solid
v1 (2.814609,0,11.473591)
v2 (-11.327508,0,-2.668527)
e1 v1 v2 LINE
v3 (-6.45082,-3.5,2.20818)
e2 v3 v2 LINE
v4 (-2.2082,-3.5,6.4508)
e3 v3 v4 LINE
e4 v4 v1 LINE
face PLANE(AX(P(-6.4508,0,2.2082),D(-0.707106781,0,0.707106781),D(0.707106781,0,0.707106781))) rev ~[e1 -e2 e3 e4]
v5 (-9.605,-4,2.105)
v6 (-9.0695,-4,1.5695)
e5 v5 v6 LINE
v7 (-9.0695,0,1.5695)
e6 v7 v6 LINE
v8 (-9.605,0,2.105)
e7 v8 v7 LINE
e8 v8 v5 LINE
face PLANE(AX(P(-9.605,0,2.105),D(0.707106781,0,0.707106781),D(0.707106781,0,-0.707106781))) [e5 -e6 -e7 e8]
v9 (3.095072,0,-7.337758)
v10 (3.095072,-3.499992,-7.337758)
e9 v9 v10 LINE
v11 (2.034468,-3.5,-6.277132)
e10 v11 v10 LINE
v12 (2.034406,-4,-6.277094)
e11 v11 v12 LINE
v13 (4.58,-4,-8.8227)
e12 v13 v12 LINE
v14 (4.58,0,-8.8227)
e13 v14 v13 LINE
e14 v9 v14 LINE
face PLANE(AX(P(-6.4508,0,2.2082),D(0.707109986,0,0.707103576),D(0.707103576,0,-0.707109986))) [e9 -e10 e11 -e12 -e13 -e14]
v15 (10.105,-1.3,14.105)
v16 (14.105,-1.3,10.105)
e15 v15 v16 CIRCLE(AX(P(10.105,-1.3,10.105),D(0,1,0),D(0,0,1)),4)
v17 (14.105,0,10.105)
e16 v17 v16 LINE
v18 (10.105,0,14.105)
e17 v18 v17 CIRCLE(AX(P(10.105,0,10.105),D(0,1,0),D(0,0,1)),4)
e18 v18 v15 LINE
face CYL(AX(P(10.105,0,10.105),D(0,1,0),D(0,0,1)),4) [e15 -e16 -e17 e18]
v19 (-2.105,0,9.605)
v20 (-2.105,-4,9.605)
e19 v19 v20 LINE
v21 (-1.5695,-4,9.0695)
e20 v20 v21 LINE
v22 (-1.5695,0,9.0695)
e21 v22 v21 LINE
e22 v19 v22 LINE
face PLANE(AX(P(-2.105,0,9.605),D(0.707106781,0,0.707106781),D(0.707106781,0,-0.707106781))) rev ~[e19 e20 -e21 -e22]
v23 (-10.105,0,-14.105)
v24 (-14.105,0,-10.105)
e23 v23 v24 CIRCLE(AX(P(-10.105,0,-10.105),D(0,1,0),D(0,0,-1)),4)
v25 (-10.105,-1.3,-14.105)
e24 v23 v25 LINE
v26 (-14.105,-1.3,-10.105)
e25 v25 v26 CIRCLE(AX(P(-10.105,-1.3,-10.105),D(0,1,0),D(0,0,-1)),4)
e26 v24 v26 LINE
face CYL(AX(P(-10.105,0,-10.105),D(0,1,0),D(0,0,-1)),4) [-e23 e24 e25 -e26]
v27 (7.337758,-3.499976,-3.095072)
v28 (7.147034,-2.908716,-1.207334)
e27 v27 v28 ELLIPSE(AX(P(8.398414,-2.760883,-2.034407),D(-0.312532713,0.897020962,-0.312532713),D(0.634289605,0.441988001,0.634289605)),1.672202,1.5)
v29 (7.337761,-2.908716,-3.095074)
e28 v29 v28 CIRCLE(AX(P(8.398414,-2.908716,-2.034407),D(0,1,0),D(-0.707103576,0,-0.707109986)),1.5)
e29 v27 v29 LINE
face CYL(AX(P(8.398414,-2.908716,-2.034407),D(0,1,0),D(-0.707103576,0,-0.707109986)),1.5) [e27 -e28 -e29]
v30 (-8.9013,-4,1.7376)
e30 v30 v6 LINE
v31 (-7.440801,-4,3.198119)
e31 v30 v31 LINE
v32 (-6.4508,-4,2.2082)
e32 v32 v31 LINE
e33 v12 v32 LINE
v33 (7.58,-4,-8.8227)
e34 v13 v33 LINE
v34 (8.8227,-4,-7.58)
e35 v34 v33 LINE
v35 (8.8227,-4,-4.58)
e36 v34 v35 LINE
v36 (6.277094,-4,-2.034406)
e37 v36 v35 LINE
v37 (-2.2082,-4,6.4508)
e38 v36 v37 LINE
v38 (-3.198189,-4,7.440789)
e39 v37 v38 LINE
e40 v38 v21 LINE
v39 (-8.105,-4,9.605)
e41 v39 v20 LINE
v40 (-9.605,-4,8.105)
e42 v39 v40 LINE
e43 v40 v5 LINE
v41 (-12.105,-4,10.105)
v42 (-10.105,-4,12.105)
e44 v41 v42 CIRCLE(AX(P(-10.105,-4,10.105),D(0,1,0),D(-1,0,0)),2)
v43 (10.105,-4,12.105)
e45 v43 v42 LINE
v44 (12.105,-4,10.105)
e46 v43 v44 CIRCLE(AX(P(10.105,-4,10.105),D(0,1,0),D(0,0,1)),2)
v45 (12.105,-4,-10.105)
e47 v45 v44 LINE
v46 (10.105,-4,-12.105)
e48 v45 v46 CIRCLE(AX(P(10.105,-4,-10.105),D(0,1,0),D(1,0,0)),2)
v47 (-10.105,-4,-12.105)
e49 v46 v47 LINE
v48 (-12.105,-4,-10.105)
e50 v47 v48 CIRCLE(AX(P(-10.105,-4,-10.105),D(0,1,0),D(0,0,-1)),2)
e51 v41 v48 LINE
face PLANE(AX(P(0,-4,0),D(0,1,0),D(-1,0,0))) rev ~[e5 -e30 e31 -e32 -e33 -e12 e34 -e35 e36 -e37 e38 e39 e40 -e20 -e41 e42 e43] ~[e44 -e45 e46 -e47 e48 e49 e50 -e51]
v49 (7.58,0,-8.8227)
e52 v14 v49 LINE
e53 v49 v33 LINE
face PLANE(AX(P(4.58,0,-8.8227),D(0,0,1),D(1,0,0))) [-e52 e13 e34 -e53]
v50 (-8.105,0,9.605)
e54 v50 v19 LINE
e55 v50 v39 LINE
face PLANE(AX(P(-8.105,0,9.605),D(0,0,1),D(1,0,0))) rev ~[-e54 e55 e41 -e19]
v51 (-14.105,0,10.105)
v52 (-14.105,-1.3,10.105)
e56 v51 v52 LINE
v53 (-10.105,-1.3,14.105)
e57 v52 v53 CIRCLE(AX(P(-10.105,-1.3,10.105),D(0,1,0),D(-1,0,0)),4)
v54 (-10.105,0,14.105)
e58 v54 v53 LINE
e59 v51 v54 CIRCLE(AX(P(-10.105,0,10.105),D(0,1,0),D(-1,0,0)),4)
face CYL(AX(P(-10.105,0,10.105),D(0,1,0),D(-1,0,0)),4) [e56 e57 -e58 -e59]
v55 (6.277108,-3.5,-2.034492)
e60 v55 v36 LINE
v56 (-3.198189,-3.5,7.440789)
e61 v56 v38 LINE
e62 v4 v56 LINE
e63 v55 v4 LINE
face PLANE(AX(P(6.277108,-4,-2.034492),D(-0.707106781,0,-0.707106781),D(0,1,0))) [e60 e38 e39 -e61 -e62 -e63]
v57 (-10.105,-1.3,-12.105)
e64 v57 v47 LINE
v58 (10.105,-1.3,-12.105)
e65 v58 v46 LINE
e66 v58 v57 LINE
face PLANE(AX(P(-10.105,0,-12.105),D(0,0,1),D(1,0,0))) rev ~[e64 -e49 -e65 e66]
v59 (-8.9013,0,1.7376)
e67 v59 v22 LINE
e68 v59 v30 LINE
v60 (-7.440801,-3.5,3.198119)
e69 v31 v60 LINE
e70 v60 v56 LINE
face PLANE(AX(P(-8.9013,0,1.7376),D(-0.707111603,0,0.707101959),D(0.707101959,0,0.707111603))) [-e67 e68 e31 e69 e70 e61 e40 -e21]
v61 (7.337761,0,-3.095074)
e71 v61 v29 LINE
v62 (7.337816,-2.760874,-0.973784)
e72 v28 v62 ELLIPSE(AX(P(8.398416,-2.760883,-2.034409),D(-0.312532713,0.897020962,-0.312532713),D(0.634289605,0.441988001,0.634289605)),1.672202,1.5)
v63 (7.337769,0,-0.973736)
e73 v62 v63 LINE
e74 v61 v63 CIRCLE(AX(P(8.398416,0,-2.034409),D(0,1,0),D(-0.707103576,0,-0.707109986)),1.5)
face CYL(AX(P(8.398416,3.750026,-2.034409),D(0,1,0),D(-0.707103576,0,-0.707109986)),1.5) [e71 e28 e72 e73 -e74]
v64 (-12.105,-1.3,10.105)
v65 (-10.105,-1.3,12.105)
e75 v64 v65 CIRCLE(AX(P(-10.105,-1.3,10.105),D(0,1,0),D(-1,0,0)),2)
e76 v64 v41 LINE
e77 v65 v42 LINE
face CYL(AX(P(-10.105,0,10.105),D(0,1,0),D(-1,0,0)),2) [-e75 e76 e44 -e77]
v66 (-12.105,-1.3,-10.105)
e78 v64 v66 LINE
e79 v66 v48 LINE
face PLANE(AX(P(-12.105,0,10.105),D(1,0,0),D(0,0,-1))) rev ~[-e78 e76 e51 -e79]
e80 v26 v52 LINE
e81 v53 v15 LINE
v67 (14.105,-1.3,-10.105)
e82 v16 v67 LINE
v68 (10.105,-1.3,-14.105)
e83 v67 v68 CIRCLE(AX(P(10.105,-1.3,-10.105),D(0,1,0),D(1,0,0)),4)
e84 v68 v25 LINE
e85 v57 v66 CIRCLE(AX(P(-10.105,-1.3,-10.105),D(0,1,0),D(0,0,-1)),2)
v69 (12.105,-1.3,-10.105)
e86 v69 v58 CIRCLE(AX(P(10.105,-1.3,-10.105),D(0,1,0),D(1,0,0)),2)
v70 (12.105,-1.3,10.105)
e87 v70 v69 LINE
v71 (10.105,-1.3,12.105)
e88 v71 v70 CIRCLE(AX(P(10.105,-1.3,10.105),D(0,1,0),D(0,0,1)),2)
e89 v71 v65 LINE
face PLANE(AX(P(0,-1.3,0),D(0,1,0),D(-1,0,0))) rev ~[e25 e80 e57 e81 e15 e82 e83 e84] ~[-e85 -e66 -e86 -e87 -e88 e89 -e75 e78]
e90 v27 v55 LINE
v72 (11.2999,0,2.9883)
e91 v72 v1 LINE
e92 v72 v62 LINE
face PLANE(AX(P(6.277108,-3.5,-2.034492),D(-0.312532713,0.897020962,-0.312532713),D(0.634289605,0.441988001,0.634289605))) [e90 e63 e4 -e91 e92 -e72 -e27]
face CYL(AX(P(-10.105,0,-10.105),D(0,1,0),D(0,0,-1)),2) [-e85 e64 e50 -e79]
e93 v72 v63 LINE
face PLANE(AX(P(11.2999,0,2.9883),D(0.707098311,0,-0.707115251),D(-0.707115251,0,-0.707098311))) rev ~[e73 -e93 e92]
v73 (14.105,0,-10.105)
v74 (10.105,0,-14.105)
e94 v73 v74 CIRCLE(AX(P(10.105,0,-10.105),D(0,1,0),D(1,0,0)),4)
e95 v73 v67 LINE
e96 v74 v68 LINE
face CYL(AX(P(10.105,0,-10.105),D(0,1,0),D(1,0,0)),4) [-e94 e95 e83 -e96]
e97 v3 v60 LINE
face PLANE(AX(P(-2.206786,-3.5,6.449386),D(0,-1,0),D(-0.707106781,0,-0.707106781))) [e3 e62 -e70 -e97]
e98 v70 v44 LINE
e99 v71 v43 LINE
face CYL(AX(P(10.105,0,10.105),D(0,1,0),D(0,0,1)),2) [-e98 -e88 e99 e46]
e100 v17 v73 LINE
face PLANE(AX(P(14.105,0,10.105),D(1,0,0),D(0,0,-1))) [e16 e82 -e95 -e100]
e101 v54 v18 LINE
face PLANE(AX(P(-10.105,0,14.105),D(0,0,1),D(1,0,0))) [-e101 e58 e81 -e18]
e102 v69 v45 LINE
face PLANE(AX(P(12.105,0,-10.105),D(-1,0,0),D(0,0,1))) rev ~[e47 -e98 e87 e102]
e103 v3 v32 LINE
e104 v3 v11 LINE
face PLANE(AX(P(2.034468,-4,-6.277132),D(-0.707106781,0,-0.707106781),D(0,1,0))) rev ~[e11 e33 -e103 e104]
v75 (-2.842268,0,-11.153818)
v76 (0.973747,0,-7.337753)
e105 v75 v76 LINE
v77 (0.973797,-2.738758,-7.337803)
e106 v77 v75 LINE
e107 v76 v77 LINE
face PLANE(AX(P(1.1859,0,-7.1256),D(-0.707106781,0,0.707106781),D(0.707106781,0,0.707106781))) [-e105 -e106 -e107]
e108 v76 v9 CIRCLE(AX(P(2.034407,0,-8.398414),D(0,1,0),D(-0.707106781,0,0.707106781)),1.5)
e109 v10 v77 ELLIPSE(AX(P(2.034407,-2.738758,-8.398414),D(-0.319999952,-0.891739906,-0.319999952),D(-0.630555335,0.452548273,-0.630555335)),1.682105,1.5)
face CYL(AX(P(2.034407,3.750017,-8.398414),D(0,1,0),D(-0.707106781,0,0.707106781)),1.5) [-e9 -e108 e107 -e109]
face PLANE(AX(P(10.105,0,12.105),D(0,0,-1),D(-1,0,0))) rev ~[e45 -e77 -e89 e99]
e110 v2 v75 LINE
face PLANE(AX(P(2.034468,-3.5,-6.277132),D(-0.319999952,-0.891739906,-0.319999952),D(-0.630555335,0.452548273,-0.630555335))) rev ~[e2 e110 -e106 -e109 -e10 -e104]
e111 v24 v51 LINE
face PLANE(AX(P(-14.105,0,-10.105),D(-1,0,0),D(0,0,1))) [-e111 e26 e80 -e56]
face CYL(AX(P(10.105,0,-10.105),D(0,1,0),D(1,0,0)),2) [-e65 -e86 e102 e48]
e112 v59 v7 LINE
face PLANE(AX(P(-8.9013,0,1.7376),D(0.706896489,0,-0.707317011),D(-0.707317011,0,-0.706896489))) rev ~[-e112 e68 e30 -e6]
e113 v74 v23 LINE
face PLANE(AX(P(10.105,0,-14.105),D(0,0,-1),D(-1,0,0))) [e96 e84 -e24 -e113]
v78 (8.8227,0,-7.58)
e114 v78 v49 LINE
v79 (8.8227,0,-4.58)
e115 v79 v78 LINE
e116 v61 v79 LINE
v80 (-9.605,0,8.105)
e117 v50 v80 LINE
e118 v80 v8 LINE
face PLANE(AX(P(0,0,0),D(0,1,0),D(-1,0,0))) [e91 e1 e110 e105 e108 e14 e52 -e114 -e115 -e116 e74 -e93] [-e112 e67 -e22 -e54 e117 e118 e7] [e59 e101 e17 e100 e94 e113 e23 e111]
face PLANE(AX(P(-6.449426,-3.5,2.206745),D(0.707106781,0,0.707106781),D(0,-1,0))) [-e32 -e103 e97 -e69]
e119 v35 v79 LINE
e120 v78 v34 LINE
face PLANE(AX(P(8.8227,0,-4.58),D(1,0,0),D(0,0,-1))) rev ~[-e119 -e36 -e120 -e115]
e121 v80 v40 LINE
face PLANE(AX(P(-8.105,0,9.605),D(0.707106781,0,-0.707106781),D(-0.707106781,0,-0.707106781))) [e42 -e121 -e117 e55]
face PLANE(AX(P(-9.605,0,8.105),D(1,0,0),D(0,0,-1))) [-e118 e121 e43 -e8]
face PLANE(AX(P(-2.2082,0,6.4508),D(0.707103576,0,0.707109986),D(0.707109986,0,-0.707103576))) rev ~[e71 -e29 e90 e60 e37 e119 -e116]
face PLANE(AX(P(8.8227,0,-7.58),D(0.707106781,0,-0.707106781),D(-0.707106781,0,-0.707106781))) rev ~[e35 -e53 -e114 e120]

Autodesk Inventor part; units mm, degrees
ref_plane "YZ Plane" through (0, 0, 0) normal (1, 0, 0) x (0, 1, 0)
ref_plane "XZ Plane" through (0, 0, 0) normal (0, 1, 0) x (-1, 0, 0)
ref_plane "XY Plane" through (0, 0, 0) normal (0, 0, 1) x (1, 0, 0)
sketch "Sketch1" plane through (0, 0, 0) normal (0, 1, 0) x (-1, 0, 0)
  line L0 (-10.105, -14.105) -> (10.105, -14.105)
  line L1 (14.105, -10.105) -> (14.105, 10.105)
  line L2 (10.105, 14.105) -> (-10.105, 14.105)
  line L3 (-14.105, 10.105) -> (-14.105, -10.105)
  line L4 (-14.105, -14.105) -> (14.105, 14.105) construction
  line L5 (14.105, -14.105) -> (-14.105, 14.105) construction
  arc A0 (14.105, 10.105) -> (10.105, 14.105) centre (10.105, 10.105) ccw
  arc A1 (-10.105, 14.105) -> (-14.105, 10.105) centre (-10.105, 10.105) ccw
  arc A2 (-14.105, -10.105) -> (-10.105, -14.105) centre (-10.105, -10.105) ccw
  arc A3 (10.105, -14.105) -> (14.105, -10.105) centre (10.105, -10.105) ccw
  line L6 (10.105, 14.105) -> (10.105, 8.105) construction
  line L7 (9.605, 8.105) -> (9.605, 2.105)
  line L8 (8.105, 9.605) -> (2.105, 9.605)
  line L9 (8.105, 9.605) -> (9.605, 8.105)
  line L10 (8.9013, 1.7376) -> (1.5695, 9.0695)
  line L11 (2.105, 9.605) -> (1.5695, 9.0695)
  line L12 (8.9013, 1.7376) -> (9.0695, 1.5695)
  line L13 (9.605, 2.105) -> (9.0695, 1.5695)
  line L14 (8.0814, 0.5776) -> (0.5776, 8.0814)
  line L15 (2.2082, 6.4508) -> (-8.8227, -4.58)
  line L16 (6.4508, 2.2082) -> (-4.58, -8.8227)
  line L17 (-4.58, -8.8227) -> (-7.58, -8.8227)
  line L18 (-8.8227, -4.58) -> (-8.8227, -7.58)
  line L19 (-8.8227, -7.58) -> (-7.58, -8.8227)
  line L20 (-10.105, 12.105) -> (10.105, 12.105)
  arc A4 (12.105, 10.105) -> (10.105, 12.105) centre (10.105, 10.105) ccw
  line L21 (12.105, 10.105) -> (12.105, -10.105)
  arc A5 (10.105, -12.105) -> (12.105, -10.105) centre (10.105, -10.105) ccw
  line L22 (10.105, -12.105) -> (-10.105, -12.105)
  arc A6 (-12.105, -10.105) -> (-10.105, -12.105) centre (-10.105, -10.105) ccw
  line L23 (-12.105, -10.105) -> (-12.105, 10.105)
  arc A7 (-10.105, 12.105) -> (-12.105, 10.105) centre (-10.105, 10.105) ccw
  point P0 (0, 0)
  point P1 (8.855, 8.855)
  point P2 (4.3295, 4.3295)
  dimension "d0" = 28.21
  dimension "d1" = 28.21
  dimension "d2" = 4
  dimension "d13" = 6
  dimension "d16" = 6
  dimension "d18" = 5
  dimension "d21" = 1.4
  dimension "d22" = 15.6
  dimension "d24" = 3
  dimension "d25" = 3
  dimension "d28" = 2
extrude "Extrusion5" add sketch "Sketch1" against normal blind 1.3 contours A2 L3 A1 L2 A0 L1 A3 L0
extrude "Extrusion6" add sketch "Sketch1" against normal blind 4 contours L20 A4 L21 A5 L22 A6 L23 A7
sketch "Sketch5" plane through (-2.2082, -4, 6.4508) normal (0.7071068, 0, -0.7071068) x (-0.7071068, 0, -0.7071068)
  line L0 (6, 0) -> (0, 0) projected
  line L1 (6, 0) -> (0, 0)
  line L2 (0, 0) -> (0, 0.5)
  line L3 (0, 0.5) -> (6, 0.5)
  line L4 (6, 0.5) -> (6, 0)
  point P0 (3, 4)
  dimension "d33" = 6
  dimension "d34" = 0.5
extrude "Extrusion7" cut sketch "Sketch5" against normal blind 4
sketch "Sketch6" plane through (0, 0, 0) normal (0, 1, 0) x (1, 0, 0)
  line L0 (-14.105, -14.105) -> (14.105, 14.105) construction
  line L1 (-14.105, 14.105) -> (14.105, -14.105) construction
  line L2 (-9.0695, -1.5695) -> (-1.5695, -9.0695) projected
  line L3 (2.8146, -11.4736) -> (11.2999, -2.9883)
  line L4 (1.1859, 7.1256) -> (-2.8423, 11.1538)
  line L5 (-2.8423, 11.1538) -> (-11.3275, 2.6685)
  line L6 (4.58, 8.8227) -> (7.58, 8.8227) projected
  line L7 (-6.4508, -2.2082) -> (4.58, 8.8227) projected
  line L8 (11.2999, -2.9883) -> (7.1256, 1.1859)
  line L9 (-2.2082, -6.4508) -> (-6.4508, -2.2082) projected
  line L10 (-2.2082, -6.4508) -> (2.8146, -11.4736)
  line L11 (-6.4508, -2.2082) -> (-11.3275, 2.6685)
  line L12 (8.8227, 4.58) -> (-2.2082, -6.4508) projected
  line L13 (7.1256, 1.1859) -> (6.9842, 1.3273)
  line L14 (1.1859, 7.1256) -> (1.3273, 6.9842)
  line L15 (6.2771, 2.0344) -> (-2.2082, -6.4508)
  line L16 (2.0344, 6.2771) -> (-6.4508, -2.2082)
  line L17 (6.9842, 1.3273) -> (6.2771, 2.0344)
  line L18 (1.3273, 6.9842) -> (2.0344, 6.2771)
  point P0 (0, 0)
  dimension "d39" = 20
  dimension "d53" = 12
extrude "Extrusion8" cut sketch "Sketch6" against normal through all
sketch "Sketch8" plane through (11.2999, -4, 2.9883) normal (-0.7071068, 0, 0.7071068) x (0.7071068, 0, 0.7071068)
  line L0 (0, 0) -> (-7.1033, 0) projected
  line L1 (0, 4) -> (0, 0) projected
  line L2 (0, 4) -> (0, 0)
  line L3 (0, 0) -> (-7.1033, 0)
  line L4 (-20, 4) -> (-20, 0) projected
  line L5 (-20, 4) -> (-20, 0)
  line L6 (-13.1033, 0) -> (-20, 0) projected
  line L7 (-13.0928, 0) -> (-20, 0)
  line L8 (-13.1033, 0) -> (-13.1033, 0.5)
  line L9 (-13.1033, 4) -> (-13.1033, 0) projected
  line L10 (-13.1033, 0.5) -> (-20, 4)
  line L11 (-7.1033, 0) -> (-7.1033, 0.5)
  line L12 (-7.1033, 0.5) -> (0, 4)
  point P0 (-10.1033, 4)
  point P1 (-13.1033, 0)
  dimension "d48" = 0.5
  dimension "d49" = 0.5
extrude "Extrusion10" add sketch "Sketch8" along normal blind 12
fillet "Fillet2" radius 1.5 2 edges at (2.0344, -1.75, -6.2771) (6.2771, -1.75, -2.0344)
properties part number "pieza_edu_fisica"
